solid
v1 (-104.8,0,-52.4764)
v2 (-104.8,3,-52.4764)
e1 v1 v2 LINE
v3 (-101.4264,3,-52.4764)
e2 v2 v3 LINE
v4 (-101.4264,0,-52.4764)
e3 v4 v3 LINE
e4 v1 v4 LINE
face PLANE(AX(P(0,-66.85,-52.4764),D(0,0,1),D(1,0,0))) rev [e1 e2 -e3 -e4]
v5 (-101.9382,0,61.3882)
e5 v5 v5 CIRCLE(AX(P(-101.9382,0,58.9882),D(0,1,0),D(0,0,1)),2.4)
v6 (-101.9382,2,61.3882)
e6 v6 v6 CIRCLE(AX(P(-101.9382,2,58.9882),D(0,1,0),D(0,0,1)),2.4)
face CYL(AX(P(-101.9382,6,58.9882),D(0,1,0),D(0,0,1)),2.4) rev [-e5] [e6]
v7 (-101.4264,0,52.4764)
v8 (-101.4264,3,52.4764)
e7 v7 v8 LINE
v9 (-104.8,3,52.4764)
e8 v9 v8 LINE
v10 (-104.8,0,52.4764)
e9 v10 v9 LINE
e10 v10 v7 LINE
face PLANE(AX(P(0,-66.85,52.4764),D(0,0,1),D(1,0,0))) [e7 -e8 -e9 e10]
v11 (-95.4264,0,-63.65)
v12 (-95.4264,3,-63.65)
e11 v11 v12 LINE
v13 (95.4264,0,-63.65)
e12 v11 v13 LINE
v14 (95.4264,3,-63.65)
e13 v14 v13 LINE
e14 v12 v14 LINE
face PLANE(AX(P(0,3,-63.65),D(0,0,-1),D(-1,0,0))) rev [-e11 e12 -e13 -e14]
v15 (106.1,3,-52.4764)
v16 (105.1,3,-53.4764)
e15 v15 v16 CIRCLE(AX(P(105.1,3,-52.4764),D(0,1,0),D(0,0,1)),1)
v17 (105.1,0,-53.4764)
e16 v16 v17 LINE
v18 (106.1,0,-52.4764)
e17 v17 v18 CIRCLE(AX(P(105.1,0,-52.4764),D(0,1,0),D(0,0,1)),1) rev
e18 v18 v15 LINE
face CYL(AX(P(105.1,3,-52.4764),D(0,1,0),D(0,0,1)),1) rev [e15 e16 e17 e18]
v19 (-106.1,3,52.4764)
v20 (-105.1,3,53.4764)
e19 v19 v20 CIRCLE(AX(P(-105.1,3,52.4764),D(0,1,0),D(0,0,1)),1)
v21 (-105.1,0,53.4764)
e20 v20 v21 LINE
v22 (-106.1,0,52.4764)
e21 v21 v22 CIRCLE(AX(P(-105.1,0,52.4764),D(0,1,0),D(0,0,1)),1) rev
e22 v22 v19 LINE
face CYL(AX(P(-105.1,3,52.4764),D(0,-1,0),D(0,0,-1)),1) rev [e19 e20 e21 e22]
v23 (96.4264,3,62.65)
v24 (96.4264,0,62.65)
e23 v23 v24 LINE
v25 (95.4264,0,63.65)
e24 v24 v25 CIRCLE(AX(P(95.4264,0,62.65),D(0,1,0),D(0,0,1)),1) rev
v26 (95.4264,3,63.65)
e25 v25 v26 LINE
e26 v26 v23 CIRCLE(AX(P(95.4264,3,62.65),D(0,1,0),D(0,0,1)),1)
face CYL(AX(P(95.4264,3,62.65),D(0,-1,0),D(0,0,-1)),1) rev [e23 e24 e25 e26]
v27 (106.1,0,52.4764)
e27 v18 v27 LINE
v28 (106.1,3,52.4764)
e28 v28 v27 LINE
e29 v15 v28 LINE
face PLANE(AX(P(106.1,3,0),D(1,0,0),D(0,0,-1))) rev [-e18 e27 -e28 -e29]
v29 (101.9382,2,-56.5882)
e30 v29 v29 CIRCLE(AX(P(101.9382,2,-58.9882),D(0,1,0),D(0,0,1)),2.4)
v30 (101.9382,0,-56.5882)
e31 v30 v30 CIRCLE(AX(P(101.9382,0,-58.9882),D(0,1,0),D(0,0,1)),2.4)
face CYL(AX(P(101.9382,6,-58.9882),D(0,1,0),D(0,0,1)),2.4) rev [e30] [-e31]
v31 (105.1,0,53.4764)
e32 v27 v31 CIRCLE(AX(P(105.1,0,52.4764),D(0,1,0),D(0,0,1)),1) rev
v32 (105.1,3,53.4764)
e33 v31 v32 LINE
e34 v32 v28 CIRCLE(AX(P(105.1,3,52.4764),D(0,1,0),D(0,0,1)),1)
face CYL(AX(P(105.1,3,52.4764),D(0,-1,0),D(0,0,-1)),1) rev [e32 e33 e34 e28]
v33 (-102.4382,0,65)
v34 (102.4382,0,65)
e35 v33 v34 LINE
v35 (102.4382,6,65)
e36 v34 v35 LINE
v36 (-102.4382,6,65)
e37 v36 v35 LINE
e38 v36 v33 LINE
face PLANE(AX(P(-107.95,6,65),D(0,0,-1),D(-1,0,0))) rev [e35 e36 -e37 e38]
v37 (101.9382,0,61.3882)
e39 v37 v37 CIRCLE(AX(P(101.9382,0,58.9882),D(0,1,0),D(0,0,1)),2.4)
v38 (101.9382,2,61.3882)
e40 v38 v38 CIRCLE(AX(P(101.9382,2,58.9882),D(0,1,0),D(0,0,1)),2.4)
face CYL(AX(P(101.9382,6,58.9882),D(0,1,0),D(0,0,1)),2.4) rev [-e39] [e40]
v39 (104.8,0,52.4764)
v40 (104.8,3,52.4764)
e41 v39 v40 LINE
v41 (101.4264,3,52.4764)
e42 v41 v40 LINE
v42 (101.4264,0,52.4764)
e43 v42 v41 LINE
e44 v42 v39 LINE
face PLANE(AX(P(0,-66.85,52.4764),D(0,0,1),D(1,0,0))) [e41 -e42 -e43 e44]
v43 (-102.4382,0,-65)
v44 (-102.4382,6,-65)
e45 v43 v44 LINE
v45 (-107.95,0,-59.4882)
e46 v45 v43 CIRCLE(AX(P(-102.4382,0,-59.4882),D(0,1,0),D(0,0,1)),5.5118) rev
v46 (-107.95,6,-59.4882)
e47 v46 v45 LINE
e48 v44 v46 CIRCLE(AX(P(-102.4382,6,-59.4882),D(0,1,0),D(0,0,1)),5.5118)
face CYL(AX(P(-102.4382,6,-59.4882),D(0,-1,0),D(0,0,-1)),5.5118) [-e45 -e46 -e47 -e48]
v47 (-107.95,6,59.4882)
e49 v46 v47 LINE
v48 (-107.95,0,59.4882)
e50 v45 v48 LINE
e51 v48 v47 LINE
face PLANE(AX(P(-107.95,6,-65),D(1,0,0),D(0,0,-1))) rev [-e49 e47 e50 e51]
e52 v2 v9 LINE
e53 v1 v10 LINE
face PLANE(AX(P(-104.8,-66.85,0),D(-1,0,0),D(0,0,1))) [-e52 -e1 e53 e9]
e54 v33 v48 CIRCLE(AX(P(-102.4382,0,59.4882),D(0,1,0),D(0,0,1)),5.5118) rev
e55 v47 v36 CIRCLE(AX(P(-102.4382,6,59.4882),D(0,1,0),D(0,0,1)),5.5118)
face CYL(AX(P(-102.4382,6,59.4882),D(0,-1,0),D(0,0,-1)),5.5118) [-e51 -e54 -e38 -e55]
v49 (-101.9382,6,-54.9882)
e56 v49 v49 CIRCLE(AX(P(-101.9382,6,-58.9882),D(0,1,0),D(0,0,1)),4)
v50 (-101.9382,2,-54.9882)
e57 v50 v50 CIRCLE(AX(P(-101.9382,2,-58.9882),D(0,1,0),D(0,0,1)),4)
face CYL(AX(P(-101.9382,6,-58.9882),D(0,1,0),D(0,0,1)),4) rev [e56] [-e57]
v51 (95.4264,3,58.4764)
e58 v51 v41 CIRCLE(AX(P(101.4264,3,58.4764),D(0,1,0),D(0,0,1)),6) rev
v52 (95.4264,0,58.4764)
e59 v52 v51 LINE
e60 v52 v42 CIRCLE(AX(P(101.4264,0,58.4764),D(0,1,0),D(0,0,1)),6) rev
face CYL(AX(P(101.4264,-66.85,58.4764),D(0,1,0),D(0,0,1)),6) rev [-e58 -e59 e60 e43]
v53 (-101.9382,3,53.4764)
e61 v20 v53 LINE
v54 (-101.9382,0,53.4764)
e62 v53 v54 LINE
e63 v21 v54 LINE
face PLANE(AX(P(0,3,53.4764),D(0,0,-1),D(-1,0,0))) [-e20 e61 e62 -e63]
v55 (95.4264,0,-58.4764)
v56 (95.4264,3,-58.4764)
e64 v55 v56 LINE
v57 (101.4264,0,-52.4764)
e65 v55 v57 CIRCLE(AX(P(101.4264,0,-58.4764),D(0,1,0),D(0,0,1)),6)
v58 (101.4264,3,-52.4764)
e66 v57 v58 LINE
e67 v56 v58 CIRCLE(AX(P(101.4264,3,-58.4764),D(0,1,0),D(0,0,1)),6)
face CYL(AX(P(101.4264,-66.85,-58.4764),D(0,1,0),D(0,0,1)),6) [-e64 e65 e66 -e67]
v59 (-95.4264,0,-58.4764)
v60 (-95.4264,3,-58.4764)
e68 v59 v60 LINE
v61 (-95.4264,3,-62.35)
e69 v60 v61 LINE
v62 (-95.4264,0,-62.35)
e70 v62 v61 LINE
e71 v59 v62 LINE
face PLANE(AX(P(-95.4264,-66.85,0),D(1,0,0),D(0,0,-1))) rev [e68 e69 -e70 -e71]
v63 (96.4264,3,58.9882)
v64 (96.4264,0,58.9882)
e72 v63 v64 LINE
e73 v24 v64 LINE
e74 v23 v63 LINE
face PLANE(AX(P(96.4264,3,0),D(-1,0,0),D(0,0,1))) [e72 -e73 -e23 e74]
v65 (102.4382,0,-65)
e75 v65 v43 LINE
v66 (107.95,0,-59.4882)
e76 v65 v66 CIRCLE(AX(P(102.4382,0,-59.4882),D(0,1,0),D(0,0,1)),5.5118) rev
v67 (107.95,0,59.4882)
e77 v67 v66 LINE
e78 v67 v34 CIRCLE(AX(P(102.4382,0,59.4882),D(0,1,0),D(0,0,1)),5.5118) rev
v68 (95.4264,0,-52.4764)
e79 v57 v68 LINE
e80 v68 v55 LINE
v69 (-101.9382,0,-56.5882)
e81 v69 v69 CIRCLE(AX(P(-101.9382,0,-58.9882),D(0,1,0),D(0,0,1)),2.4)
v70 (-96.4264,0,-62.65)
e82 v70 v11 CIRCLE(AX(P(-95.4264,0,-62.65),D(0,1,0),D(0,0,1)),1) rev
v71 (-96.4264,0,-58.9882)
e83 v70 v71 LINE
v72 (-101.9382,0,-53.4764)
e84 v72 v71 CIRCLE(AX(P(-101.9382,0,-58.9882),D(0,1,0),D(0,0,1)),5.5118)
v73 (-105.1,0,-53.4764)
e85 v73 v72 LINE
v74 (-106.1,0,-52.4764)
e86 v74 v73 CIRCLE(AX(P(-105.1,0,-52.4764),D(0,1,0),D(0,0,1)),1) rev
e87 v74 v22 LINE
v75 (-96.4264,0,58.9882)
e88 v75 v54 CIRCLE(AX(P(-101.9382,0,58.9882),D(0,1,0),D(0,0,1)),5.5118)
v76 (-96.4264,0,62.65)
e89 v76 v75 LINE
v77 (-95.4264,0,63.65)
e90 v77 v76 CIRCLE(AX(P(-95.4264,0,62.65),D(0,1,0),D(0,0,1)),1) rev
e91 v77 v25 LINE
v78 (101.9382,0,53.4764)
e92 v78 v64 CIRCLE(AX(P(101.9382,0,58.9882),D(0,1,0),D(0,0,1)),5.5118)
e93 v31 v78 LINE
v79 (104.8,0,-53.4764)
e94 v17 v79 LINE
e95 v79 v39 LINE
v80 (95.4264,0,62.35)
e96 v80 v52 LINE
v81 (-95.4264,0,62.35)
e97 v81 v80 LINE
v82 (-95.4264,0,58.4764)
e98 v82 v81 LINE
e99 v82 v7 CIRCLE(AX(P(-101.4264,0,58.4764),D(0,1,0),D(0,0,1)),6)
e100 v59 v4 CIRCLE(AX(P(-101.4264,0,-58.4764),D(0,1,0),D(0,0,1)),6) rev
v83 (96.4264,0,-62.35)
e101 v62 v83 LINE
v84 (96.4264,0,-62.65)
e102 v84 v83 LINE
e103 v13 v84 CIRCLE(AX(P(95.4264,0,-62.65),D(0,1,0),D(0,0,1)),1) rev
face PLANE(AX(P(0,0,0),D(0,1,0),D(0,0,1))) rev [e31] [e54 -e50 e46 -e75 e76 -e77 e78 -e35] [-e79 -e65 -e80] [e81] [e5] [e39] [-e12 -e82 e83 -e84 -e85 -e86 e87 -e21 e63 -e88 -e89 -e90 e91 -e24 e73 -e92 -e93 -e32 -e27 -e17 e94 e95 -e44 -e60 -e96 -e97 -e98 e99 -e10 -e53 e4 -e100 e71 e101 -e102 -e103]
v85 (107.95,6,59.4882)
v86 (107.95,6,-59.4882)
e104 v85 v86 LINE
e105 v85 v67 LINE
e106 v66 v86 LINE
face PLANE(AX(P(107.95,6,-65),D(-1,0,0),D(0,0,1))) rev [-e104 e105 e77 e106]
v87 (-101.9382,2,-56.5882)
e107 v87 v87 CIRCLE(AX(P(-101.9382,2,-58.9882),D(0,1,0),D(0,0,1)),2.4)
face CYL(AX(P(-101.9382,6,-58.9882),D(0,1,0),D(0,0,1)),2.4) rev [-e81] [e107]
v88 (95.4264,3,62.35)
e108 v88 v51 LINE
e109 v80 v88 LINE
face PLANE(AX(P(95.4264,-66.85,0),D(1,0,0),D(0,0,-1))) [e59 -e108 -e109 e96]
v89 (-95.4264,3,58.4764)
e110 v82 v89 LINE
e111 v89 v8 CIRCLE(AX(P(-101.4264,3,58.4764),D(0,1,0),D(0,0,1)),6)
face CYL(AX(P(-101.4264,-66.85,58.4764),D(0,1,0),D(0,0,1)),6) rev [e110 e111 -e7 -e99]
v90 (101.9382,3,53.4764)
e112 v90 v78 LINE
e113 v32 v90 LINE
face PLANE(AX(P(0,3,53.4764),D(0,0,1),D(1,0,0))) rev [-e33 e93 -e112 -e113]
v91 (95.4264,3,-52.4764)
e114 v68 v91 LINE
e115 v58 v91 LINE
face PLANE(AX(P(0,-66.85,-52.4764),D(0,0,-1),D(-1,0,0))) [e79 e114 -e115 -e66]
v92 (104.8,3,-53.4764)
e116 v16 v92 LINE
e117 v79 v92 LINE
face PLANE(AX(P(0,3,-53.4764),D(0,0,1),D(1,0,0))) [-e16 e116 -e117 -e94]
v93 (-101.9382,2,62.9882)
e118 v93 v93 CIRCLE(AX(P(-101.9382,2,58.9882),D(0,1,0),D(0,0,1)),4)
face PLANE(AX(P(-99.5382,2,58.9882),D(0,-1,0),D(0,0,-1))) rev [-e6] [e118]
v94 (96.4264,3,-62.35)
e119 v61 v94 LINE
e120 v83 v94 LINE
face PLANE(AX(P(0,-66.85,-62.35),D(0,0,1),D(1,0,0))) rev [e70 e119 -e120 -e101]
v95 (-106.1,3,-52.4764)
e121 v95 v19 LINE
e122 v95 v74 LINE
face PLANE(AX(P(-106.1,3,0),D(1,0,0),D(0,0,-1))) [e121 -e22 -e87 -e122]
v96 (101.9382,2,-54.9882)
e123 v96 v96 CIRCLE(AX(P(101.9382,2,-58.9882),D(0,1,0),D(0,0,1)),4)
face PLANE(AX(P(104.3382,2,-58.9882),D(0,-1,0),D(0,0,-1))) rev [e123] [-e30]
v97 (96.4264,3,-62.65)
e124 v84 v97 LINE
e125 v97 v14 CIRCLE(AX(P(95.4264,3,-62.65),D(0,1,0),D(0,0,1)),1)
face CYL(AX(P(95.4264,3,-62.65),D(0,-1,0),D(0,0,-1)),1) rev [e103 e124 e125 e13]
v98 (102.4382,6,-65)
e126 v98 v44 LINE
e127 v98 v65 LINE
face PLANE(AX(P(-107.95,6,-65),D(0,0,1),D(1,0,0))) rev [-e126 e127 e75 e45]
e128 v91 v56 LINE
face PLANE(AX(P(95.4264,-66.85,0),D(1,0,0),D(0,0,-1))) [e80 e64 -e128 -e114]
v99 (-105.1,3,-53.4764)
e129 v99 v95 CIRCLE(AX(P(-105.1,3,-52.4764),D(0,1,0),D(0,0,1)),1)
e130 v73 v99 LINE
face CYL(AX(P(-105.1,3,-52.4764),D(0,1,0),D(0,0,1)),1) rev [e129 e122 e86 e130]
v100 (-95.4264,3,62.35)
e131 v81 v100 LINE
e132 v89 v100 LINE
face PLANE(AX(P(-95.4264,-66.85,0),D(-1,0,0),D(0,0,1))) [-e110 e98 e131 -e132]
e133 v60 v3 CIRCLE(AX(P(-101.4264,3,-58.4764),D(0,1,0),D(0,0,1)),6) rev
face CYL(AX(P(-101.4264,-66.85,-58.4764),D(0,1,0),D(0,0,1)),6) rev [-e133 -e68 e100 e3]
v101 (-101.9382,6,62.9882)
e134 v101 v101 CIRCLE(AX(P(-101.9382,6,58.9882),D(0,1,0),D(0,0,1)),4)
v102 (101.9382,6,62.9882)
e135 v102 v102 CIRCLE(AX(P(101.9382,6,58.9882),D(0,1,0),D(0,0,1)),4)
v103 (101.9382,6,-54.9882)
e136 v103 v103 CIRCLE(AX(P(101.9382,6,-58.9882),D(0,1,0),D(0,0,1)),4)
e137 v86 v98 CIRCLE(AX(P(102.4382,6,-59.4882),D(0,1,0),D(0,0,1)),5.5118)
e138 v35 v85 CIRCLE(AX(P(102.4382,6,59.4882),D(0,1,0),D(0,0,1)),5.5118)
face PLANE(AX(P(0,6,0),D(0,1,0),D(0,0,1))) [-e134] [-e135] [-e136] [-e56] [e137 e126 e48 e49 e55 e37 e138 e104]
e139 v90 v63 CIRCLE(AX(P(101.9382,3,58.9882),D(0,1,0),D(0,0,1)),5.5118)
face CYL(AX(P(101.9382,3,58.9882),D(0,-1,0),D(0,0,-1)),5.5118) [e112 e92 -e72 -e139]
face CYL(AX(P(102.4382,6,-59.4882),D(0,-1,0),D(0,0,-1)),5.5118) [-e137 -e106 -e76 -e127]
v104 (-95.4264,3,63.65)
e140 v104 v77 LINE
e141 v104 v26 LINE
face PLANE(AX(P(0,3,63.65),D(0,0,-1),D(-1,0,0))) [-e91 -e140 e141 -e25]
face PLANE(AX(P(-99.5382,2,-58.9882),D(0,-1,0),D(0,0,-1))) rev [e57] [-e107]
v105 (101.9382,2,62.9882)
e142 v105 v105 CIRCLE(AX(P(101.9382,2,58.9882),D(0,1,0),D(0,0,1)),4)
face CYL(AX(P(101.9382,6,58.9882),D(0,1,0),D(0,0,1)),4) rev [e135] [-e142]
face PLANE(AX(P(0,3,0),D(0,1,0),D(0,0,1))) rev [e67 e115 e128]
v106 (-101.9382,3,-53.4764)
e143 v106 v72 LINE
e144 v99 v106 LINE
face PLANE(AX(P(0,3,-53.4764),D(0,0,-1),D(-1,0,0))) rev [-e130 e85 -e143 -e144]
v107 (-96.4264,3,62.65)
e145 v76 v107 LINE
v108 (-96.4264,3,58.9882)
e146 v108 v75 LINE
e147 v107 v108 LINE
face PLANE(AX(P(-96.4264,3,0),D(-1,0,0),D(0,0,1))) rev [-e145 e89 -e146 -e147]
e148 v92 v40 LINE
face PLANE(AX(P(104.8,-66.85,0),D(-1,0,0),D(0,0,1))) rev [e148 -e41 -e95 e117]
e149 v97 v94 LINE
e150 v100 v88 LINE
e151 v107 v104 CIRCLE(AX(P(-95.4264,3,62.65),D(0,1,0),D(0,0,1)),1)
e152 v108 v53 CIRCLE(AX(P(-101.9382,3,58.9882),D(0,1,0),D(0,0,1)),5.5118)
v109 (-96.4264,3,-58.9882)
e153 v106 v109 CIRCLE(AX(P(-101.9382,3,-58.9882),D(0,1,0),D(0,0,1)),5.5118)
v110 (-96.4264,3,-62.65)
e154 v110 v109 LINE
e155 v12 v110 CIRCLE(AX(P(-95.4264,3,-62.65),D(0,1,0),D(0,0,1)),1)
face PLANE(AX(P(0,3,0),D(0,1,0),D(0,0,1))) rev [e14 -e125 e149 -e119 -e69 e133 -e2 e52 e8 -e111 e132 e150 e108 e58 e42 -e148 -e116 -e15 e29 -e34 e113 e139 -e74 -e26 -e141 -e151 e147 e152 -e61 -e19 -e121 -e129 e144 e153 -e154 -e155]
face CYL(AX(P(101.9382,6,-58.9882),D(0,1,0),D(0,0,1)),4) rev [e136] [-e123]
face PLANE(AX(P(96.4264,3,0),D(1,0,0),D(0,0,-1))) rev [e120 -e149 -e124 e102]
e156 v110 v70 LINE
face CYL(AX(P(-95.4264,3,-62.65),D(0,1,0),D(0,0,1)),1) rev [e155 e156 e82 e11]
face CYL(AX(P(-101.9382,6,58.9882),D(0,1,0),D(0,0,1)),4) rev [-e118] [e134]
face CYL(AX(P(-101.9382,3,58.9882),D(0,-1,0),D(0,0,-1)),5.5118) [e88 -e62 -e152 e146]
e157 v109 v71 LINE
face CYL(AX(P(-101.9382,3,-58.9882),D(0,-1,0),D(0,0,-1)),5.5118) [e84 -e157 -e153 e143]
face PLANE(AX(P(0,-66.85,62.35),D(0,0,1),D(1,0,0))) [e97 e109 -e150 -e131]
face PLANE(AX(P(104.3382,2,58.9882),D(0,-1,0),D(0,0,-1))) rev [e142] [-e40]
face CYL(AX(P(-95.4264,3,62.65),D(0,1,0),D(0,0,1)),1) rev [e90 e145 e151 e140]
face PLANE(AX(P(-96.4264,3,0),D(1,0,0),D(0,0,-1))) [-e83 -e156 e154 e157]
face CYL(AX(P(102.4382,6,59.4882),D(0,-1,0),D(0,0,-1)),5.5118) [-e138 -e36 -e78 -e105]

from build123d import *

# Parameters (mm, degrees)
SKETCH1_W                      = 215.9
SKETCH1_H                      = 130
BOSS_EXTRUDE1_DEPTH            = 6
FILLET1_R                      = 5.5118
CAVITY3_DEPTH                  = 3
CBORE_FOR_M4_SHCS1_D           = 4.8
CBORE_FOR_M4_SHCS1_CBORE_D     = 8
CBORE_FOR_M4_SHCS1_CBORE_DEPTH = 4


# Read off the part's stored shape, not the designer's step: Cavity3
with BuildPart() as part:
    # Sketch1 → Boss-Extrude1 (new body)
    with BuildSketch(Plane(origin=(0, 0, 0), x_dir=(1, 0, 0), z_dir=(0, 1, 0))):
        Rectangle(SKETCH1_W, SKETCH1_H)
    extrude(amount=BOSS_EXTRUDE1_DEPTH)

    # Fillet1
    fillet1_edges = [part.edges().sort_by_distance(p)[0] for p in [
        (107.95, 3, 65),
        (-107.95, 3, 65),
        (-107.95, 3, -65),
        (107.95, 3, -65),
    ]]
    fillet(fillet1_edges, radius=FILLET1_R)

    # Cavity3 outline → Cavity3 (cut)
    with BuildSketch(Plane(origin=(0, 0, 0), x_dir=(1, 0, 0), z_dir=(0, 1, 0))):
        with BuildLine():
            ThreePointArc((-106.1, -52.4764), (-105.807106781, -53.183506781), (-105.1, -53.4764))
            Line((-105.1, -53.4764), (-101.9382, -53.4764))
            ThreePointArc((-101.9382, -53.4764), (-98.040768843, -55.090768843), (-96.4264, -58.9882))
            Line((-96.4264, -58.9882), (-96.4264, -62.65))
            ThreePointArc((-96.4264, -62.65), (-96.133506781, -63.357106781), (-95.4264, -63.65))
            Line((-95.4264, -63.65), (95.4264, -63.65))
            ThreePointArc((95.4264, -63.65), (96.133506781, -63.357106781), (96.4264, -62.65))
            Line((96.4264, -62.65), (96.4264, -58.9882))
            ThreePointArc((96.4264, -58.9882), (98.040768843, -55.090768843), (101.9382, -53.4764))
            Line((101.9382, -53.4764), (105.1, -53.4764))
            ThreePointArc((105.1, -53.4764), (105.807106781, -53.183506781), (106.1, -52.4764))
            Line((106.1, -52.4764), (106.1, 52.4764))
            ThreePointArc((106.1, 52.4764), (105.807106781, 53.183506781), (105.1, 53.4764))
            Line((105.1, 53.4764), (104.8, 53.4764))
            Line((104.8, 53.4764), (104.8, -52.4764))
            Line((104.8, -52.4764), (101.4264, -52.4764))
            ThreePointArc((101.4264, -52.4764), (97.183759313, -54.233759313), (95.4264, -58.4764))
            Line((95.4264, -58.4764), (95.4264, -62.35))
            Line((95.4264, -62.35), (-95.4264, -62.35))
            Line((-95.4264, -62.35), (-95.4264, -58.4764))
            ThreePointArc((-95.4264, -58.4764), (-97.183759313, -54.233759313), (-101.4264, -52.4764))
            Line((-101.4264, -52.4764), (-104.8, -52.4764))
            Line((-104.8, -52.4764), (-104.8, 52.4764))
            Line((-104.8, 52.4764), (-101.4264, 52.4764))
            ThreePointArc((-101.4264, 52.4764), (-97.183759313, 54.233759313), (-95.4264, 58.4764))
            Line((-95.4264, 58.4764), (-95.4264, 62.35))
            Line((-95.4264, 62.35), (96.4264, 62.35))
            Line((96.4264, 62.35), (96.4264, 62.65))
            ThreePointArc((96.4264, 62.65), (96.133506781, 63.357106781), (95.4264, 63.65))
            Line((95.4264, 63.65), (-95.4264, 63.65))
            ThreePointArc((-95.4264, 63.65), (-96.133506781, 63.357106781), (-96.4264, 62.65))
            Line((-96.4264, 62.65), (-96.4264, 58.9882))
            ThreePointArc((-96.4264, 58.9882), (-98.040768843, 55.090768843), (-101.9382, 53.4764))
            Line((-101.9382, 53.4764), (-105.1, 53.4764))
            ThreePointArc((-105.1, 53.4764), (-105.807106781, 53.183506781), (-106.1, 52.4764))
            Line((-106.1, 52.4764), (-106.1, -52.4764))
        make_face()
        with BuildLine():
            Line((95.4264, 52.4764), (101.4264, 52.4764))
            ThreePointArc((101.4264, 52.4764), (97.183759313, 54.233759313), (95.4264, 58.4764))
            Line((95.4264, 58.4764), (95.4264, 52.4764))
        make_face()
    extrude(amount=CAVITY3_DEPTH, mode=Mode.SUBTRACT)

    # CBORE for M4 SHCS1 (through all)
    with Locations(Plane(origin=(0, 6, 0), x_dir=(1, 0, 0), z_dir=(0, 1, 0))):
        with Locations((-101.9382, 58.9882), (-101.9382, -58.9882), (101.9382, -58.9882), (101.9382, 58.9882)):
            CounterBoreHole(CBORE_FOR_M4_SHCS1_D / 2, CBORE_FOR_M4_SHCS1_CBORE_D / 2, CBORE_FOR_M4_SHCS1_CBORE_DEPTH)


solid = part.part
